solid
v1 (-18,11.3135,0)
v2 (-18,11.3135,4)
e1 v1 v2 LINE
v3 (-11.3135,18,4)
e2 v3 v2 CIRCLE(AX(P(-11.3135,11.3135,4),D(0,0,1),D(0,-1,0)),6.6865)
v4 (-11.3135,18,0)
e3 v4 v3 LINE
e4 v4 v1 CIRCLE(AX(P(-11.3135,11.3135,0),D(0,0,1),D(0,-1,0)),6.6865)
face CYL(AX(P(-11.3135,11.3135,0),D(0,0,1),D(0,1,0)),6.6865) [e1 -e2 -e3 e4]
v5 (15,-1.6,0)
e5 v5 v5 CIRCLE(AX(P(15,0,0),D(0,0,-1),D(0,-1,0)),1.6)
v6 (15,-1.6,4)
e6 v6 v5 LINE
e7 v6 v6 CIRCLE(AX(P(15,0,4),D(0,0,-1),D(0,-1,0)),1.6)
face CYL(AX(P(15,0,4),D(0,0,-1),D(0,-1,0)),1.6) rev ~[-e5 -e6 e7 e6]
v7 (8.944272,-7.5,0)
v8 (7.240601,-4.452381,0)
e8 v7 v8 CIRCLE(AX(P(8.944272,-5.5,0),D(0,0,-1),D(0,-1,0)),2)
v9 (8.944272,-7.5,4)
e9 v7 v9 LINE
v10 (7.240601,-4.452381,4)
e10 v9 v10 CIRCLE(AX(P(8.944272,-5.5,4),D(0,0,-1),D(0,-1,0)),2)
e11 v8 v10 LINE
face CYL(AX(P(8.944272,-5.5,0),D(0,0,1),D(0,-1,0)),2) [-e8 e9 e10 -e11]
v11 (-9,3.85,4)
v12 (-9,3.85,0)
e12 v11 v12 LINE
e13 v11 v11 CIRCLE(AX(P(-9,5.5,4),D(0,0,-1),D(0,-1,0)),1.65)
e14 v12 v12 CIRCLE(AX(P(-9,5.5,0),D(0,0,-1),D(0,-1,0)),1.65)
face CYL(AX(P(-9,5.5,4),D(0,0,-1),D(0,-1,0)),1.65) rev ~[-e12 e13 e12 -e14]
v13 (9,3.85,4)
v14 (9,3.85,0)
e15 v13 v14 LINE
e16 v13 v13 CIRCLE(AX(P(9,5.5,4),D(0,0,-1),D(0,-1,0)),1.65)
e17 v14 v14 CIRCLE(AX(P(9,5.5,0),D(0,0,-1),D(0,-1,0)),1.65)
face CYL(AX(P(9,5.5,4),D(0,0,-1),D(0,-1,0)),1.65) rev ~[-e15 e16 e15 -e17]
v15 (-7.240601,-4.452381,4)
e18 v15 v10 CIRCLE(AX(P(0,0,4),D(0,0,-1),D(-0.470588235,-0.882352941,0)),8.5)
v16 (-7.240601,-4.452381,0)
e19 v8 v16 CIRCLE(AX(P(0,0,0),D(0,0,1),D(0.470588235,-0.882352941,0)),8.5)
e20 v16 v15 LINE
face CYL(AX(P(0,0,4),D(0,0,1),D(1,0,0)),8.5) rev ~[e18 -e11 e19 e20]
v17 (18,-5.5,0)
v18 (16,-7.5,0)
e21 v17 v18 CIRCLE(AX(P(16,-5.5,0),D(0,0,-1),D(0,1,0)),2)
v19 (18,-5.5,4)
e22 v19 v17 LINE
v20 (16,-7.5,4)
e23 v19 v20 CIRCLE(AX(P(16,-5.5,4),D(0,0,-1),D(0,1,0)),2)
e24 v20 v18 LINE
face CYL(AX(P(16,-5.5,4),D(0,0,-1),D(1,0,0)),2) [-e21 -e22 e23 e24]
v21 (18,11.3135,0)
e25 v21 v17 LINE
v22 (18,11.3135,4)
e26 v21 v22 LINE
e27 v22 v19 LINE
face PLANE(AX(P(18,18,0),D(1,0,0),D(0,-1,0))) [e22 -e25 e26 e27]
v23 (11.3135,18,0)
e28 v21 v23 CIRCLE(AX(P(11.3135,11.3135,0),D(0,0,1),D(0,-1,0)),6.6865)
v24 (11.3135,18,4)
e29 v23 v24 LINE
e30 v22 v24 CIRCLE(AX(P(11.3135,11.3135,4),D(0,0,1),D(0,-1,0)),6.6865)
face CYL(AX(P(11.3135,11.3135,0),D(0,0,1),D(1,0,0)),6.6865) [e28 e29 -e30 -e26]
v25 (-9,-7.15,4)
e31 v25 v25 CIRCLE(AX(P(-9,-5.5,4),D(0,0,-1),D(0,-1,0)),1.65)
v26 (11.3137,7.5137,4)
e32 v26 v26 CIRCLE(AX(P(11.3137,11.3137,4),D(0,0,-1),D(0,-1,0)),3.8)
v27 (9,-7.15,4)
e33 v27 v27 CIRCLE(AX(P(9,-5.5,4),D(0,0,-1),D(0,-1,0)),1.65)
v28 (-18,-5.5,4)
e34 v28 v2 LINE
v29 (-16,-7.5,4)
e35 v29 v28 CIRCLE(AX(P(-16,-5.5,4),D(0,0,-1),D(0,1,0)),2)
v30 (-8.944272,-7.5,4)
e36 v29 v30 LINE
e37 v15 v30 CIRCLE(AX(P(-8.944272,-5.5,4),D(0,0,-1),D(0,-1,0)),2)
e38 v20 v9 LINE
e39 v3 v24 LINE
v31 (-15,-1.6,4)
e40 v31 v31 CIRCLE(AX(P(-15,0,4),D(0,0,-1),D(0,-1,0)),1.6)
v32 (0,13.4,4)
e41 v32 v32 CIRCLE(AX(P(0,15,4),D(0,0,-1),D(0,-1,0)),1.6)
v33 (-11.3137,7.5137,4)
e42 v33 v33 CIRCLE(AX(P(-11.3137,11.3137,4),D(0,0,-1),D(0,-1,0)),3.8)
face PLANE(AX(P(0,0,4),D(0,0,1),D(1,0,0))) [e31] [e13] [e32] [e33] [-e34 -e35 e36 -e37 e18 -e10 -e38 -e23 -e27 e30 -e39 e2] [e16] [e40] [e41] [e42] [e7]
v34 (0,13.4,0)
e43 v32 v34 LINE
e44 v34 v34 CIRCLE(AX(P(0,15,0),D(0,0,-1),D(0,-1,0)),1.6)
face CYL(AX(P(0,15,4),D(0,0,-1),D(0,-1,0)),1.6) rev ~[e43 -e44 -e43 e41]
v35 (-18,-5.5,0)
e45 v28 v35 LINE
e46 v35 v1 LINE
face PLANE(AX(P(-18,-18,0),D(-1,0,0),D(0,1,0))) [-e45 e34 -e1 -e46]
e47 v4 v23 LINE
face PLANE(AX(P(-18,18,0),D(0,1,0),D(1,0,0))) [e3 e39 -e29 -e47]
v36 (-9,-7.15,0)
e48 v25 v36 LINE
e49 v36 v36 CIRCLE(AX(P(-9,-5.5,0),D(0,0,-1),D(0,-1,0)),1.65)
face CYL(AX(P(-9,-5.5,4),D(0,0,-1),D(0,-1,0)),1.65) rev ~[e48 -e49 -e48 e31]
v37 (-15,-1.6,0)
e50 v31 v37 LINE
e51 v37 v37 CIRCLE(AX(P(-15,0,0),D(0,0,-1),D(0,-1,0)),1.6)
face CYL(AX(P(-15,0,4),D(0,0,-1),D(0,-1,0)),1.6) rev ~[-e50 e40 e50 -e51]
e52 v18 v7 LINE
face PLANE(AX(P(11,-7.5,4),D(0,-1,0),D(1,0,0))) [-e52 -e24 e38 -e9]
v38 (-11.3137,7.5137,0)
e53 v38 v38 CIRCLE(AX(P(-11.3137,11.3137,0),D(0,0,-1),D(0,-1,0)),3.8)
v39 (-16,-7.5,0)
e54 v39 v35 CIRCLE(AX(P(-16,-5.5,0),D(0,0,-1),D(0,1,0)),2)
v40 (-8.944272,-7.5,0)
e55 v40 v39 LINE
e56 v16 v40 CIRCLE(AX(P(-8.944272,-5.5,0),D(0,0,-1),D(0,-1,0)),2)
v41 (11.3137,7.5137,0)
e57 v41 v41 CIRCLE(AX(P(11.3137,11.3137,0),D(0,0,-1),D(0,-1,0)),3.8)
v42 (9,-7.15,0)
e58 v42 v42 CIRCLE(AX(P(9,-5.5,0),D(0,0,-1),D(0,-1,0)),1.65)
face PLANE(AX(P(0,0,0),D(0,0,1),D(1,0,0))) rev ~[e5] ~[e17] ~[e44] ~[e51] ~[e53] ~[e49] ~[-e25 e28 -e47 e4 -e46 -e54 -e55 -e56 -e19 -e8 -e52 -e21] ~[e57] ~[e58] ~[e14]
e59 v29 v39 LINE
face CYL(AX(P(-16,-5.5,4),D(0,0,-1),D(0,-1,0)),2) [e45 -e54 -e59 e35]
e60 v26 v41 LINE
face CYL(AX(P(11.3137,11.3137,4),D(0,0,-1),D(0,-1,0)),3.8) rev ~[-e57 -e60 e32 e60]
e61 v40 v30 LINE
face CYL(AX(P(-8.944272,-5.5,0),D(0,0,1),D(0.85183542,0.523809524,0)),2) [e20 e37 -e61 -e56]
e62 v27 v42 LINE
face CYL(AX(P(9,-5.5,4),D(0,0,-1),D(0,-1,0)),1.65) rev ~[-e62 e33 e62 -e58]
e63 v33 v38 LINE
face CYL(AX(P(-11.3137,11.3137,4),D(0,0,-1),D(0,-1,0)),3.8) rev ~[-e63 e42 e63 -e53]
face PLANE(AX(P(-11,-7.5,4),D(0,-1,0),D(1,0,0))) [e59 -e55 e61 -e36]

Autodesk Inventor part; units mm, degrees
ref_plane "YZ Plane" through (0, 0, 0) normal (1, 0, 0) x (0, 1, 0)
ref_plane "XZ Plane" through (0, 0, 0) normal (0, 1, 0) x (-1, 0, 0)
ref_plane "XY Plane" through (0, 0, 0) normal (0, 0, 1) x (1, 0, 0)
sketch "スケッチ1" plane through (0, 0, 0) normal (0, 0, 1) x (1, 0, 0)
  line L0 (18, -18) -> (-18, -18)
  line L1 (-18, -18) -> (-18, 18)
  line L2 (-18, 18) -> (18, 18)
  line L3 (18, 18) -> (18, -18)
  line L4 (18, -18) -> (-18, 18) construction
  line L5 (-18, -18) -> (18, 18) construction
  point P0 (0, 0)
  point P1 (0, 0)
  dimension "d34" = 36
  dimension "d35" = 36
extrude "押し出し1" add sketch "スケッチ1" along normal blind 4
sketch "スケッチ3" plane through (0, 0, 4) normal (0, 0, 1) x (1, 0, 0)
  line L0 (-9, -5.5) -> (9, -5.5)
  line L1 (9, -5.5) -> (9, 5.5)
  line L2 (9, 5.5) -> (-9, 5.5)
  line L3 (-9, 5.5) -> (-9, -5.5)
  line L4 (-9, -5.5) -> (9, 5.5) construction
  line L5 (9, -5.5) -> (-9, 5.5) construction
  point P0 (0, 0)
  dimension "d18" = 18
  dimension "d19" = 11
hole "穴2" at (-9, 5.5, 4) at (-9, -5.5, 4) at (9, -5.5, 4) at (9, 5.5, 4) direction (0, 0, -1) diameter 3.3 end through all
sketch "スケッチ4" plane through (0, 0, 4) normal (0, 0, 1) x (1, 0, 0)
  circle A0 centre (0, 0) radius 8.5
  dimension "d27" = 17
extrude "押し出し2" cut sketch "スケッチ4" against normal through all
sketch "スケッチ5" plane through (0, 0, 4) normal (0, 0, 1) x (1, 0, 0)
  circle A0 centre (0, 0) radius 15
  point P0 (0, 15)
  point P1 (-15, 0)
  point P2 (0, -15)
  point P3 (15, 0)
  dimension "d36" = 30
  dimension "d39" = 360
hole "穴3" at (15, 0, 4) at (-15, 0, 4) at (0, 15, 4) direction (0, 0, -1) diameter 3.2 end through all clearance for "Flat Head Machine Screw" size "M3" standard "Ansi Metric M Profile"
sketch "スケッチ6" plane through (0, 0, 4) normal (0, 0, 1) x (1, 0, 0)
  circle A0 centre (0, 0) radius 16
  point P0 (-11.3137, 11.3137)
  point P1 (-11.3137, -11.3137)
  point P2 (11.3137, -11.3137)
  point P3 (11.3137, 11.3137)
  dimension "d48" = 32
  dimension "d51" = 360
hole "穴4" at (-11.3137, 11.3137, 4) at (-11.3137, -11.3137, 4) at (11.3137, -11.3137, 4) at (11.3137, 11.3137, 4) direction (0, 0, -1) diameter 4.3 end through all counterbore diameter 7.6 counterbore depth 10 clearance for "Socket Head Cap Screw" size "M4" standard "Ansi Metric M Profile"
sketch "スケッチ9" plane through (0, 0, 4) normal (0, 0, 1) x (1, 0, 0)
  line L0 (-11, -7.5) -> (11, -7.5)
  line L1 (11, -7.5) -> (11, 7.5)
  line L2 (11, 7.5) -> (-11, 7.5)
  line L3 (-11, 7.5) -> (-11, -7.5)
  line L4 (-11, -7.5) -> (11, 7.5) construction
  line L5 (11, -7.5) -> (-11, 7.5) construction
  line L6 (-18, 18) -> (-18, -18) projected
  line L7 (-18, -7.5) -> (18, -7.5)
  line L8 (18, -7.5) -> (18, -18)
  line L9 (18, -18) -> (-18, -18)
  line L10 (-18, -18) -> (-18, -7.5)
  line L11 (18, -18) -> (18, 18) projected
  point P0 (0, 0)
  point P1 (18, -11.3137)
  point P2 (18, 11.3137)
  point P3 (-18, -11.3137)
  dimension "d71" = 22
  dimension "d72" = 15
extrude "押し出し5" cut sketch "スケッチ9" against normal through all contours L0 L7 L8 L9 L6
fillet "フィレット2" radius 2 4 edges at (4, -7.5, 2) (-4, -7.5, 2) (-18, -7.5, 2) (18, -7.5, 2)
sketch "スケッチ11" plane through (0, 0, 0) normal (0, 0, -1) x (-1, 0, 0)
  point P0 (0, 0)
fillet "フィレット4" radius 6.6865 2 edges at (-18, 18, 2) (18, 18, 2)
properties part number "unit-base5"
